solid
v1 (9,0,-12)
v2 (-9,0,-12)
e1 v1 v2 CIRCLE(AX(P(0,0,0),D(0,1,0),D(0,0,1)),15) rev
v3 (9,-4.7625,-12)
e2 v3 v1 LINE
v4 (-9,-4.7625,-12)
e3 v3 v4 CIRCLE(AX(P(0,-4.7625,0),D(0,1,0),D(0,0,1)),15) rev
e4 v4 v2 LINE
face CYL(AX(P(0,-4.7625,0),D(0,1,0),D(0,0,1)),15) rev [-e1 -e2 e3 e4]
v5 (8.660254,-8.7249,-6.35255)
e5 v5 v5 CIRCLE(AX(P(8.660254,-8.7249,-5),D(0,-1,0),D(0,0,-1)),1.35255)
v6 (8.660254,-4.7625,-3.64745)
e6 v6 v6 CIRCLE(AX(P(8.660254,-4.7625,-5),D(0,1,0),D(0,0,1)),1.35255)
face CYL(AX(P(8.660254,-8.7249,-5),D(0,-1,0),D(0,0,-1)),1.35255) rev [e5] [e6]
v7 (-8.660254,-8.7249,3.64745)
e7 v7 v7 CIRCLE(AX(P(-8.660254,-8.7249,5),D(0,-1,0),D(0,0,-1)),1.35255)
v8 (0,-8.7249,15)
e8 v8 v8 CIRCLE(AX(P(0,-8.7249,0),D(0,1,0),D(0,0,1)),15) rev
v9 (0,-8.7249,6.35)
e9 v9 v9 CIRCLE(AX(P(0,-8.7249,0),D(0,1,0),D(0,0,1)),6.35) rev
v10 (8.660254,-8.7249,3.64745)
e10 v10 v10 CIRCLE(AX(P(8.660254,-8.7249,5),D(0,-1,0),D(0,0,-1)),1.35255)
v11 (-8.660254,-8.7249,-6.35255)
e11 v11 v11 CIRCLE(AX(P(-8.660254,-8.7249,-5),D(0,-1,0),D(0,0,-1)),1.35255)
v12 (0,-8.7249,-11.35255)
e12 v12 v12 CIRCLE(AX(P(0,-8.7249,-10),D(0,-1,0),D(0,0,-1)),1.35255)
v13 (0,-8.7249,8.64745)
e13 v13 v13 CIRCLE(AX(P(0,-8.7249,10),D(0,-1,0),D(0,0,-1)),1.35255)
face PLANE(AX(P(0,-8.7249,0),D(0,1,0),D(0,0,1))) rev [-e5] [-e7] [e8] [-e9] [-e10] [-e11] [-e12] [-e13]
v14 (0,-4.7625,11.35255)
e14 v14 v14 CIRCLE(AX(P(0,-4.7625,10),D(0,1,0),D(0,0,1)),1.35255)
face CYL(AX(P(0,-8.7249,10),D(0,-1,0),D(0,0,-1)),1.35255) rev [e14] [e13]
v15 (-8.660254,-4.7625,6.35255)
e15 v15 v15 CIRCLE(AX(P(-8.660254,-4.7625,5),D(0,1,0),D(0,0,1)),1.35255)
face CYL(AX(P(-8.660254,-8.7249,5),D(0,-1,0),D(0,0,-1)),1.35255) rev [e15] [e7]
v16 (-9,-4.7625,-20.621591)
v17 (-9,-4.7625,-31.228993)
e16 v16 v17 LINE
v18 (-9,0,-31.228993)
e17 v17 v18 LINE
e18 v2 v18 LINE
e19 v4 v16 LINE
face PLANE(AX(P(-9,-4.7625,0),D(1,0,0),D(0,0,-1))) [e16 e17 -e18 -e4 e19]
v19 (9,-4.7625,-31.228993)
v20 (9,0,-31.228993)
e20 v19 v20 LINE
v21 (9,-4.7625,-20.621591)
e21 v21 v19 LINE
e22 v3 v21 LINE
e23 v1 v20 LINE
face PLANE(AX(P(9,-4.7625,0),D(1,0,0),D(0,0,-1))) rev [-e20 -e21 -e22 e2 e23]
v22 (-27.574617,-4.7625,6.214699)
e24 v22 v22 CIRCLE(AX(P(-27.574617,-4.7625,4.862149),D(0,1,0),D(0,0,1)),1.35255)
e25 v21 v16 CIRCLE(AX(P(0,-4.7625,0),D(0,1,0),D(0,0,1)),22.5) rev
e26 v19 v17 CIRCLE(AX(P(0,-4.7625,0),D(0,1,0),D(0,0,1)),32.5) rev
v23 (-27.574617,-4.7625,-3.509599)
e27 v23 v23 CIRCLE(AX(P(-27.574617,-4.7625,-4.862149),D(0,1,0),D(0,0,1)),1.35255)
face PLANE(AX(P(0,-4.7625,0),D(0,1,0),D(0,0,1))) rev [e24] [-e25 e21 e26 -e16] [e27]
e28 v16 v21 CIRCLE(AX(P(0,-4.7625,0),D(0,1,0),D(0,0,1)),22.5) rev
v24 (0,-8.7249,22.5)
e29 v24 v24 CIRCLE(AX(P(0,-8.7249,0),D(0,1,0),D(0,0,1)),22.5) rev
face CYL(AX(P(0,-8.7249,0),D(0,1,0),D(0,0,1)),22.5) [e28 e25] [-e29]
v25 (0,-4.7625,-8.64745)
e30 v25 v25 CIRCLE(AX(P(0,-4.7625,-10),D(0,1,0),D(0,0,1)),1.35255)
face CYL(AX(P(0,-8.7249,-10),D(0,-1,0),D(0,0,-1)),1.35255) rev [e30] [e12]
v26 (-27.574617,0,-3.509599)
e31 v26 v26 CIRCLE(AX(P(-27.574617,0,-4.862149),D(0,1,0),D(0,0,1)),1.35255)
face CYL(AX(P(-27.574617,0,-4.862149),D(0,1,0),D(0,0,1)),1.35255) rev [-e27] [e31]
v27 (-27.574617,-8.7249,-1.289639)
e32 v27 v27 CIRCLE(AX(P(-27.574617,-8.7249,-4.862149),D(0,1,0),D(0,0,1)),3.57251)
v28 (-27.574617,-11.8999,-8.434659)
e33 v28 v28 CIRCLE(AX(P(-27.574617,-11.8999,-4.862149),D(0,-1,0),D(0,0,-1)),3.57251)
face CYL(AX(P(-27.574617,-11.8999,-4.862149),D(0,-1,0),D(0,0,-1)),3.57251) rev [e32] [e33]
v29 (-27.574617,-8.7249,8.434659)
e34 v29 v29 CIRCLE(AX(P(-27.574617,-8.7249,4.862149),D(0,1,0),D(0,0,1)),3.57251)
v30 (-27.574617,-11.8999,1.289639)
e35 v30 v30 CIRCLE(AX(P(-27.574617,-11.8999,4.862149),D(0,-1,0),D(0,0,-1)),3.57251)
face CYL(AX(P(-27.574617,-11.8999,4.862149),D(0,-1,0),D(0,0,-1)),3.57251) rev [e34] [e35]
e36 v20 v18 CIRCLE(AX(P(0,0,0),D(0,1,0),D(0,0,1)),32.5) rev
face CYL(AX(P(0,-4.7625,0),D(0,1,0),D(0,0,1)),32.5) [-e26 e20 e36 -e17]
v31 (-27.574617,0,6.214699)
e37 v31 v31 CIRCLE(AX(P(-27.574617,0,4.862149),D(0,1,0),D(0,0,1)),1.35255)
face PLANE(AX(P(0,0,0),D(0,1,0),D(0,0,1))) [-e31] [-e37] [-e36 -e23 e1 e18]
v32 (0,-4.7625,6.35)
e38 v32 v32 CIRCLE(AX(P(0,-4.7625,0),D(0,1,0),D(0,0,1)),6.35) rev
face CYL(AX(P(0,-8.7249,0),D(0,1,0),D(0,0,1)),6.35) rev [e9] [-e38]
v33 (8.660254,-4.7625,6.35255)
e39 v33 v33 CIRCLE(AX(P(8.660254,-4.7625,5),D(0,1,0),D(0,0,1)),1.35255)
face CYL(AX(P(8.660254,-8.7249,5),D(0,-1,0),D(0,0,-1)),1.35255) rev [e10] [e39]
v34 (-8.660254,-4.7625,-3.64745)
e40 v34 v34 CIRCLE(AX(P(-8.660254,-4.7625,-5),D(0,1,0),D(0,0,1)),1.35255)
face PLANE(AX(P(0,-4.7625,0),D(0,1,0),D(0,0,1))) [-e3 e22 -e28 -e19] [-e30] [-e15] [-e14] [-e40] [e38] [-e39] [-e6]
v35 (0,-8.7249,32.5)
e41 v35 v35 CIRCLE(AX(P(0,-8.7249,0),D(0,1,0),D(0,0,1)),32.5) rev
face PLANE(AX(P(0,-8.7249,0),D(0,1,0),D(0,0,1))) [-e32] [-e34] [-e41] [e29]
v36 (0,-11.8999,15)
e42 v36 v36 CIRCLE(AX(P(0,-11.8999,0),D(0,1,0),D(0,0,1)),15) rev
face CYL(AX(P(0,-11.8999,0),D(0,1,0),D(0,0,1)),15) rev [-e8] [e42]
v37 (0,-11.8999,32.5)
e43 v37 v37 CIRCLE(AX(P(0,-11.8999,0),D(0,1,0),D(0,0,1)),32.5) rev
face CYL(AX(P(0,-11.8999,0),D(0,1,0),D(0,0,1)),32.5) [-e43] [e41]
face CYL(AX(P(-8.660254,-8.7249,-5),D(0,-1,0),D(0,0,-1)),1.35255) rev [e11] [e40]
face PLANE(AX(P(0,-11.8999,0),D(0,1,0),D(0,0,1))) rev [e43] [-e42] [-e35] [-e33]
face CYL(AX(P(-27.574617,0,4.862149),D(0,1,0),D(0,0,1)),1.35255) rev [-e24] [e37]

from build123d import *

# Parameters (mm, degrees)
SPINDLE_START                             = 4.7625
SKETCH6_R                                 = 22.5
SKETCH6_R_2                               = 6.35
SPINDLE_CENTER_DEPTH                      = 3.9624
LOWER_START                               = 8.7249
LOWER_FLANGE_DEPTH                        = 3.175
UPPER_FLANGE_DEPTH                        = 4.7625
F_6_32_TAPPED_HOLE1_D                     = 2.7051
CBORE_START                               = -11.8999
CBORE_FOR_6_SOCKET_HEAD_CAP_SCREW1_OUTL_R = 3.57251
CBORE_FOR_6_SOCKET_HEAD_CAP_SCREW1_DEPTH  = 3.175
F_6_32_TAPPED_HOLE3_D                     = 2.7051
F_6_32_TAPPED_HOLE3_DEPTH                 = 9.49
F_6_32_TAPPED_HOLE3_TIP                   = 0.81269403


# Read off the part's stored shape, not the designer's step: CBORE for #6 Socket Head Cap Screw1
with BuildPart() as part:
    # Sketch6 → Spindle Center (new body)
    with BuildSketch(Plane.XZ.offset(SPINDLE_START)):
        with Locations(Location((0, 0, 0), (0, 0, 90))):
            Circle(SKETCH6_R)
        with Locations(Location((0, 0, 0), (0, 0, 90))):
            Circle(SKETCH6_R_2, mode=Mode.SUBTRACT)
    extrude(amount=SPINDLE_CENTER_DEPTH)

    # Sketch6<3> → Lower Flange (add)
    with BuildSketch(Plane.XZ.offset(LOWER_START)):
        with BuildLine():
            Line((0, -32.5), (0, -22.5))
            ThreePointArc((0, -22.5), (-4.596966983, -22.025392041), (-9, -20.621590627))
            Line((-9, -20.621590627), (-9, -31.228992939))
            ThreePointArc((-9, -31.228992939), (-4.544652323, -32.180679534), (0, -32.5))
        make_face()
        with BuildLine():
            Line((-9, -31.228992939), (-9, -20.621590627))
            ThreePointArc((-9, -20.621590627), (-22.025392041, 4.596966983), (0, 22.5))
            Line((0, 22.5), (0, 32.5))
            ThreePointArc((0, 32.5), (-32.180679534, 4.544652323), (-9, -31.228992939))
        make_face()
        with BuildLine():
            ThreePointArc((22.5, 0), (18.824850597, -12.323757544), (9, -20.621590627))
            Line((9, -20.621590627), (9, -31.228992939))
            ThreePointArc((9, -31.228992939), (25.968731197, -19.541622246), (32.5, 0))
            ThreePointArc((32.5, 0), (22.980970389, 22.980970389), (0, 32.5))
            Line((0, 32.5), (0, 22.5))
            ThreePointArc((0, 22.5), (15.909902577, 15.909902577), (22.5, 0))
        make_face()
        with BuildLine():
            Line((9, -31.228992939), (9, -20.621590627))
            ThreePointArc((9, -20.621590627), (4.596966983, -22.025392041), (0, -22.5))
            Line((0, -22.5), (0, -32.5))
            ThreePointArc((0, -32.5), (4.544652323, -32.180679534), (9, -31.228992939))
        make_face()
        with BuildLine():
            ThreePointArc((15, 0), (13.416407865, -6.708203932), (9, -12))
            Line((9, -12), (9, -20.621590627))
            ThreePointArc((9, -20.621590627), (18.824850597, -12.323757544), (22.5, 0))
            ThreePointArc((22.5, 0), (15.909902577, 15.909902577), (0, 22.5))
            Line((0, 22.5), (0, 15))
            ThreePointArc((0, 15), (10.606601718, 10.606601718), (15, 0))
        make_face()
        with BuildLine():
            Line((9, -20.621590627), (9, -12))
            ThreePointArc((9, -12), (4.74341649, -14.230249471), (0, -15))
            Line((0, -15), (0, -22.5))
            ThreePointArc((0, -22.5), (4.596966983, -22.025392041), (9, -20.621590627))
        make_face()
        with BuildLine():
            Line((0, -22.5), (0, -15))
            ThreePointArc((0, -15), (-4.74341649, -14.230249471), (-9, -12))
            Line((-9, -12), (-9, -20.621590627))
            ThreePointArc((-9, -20.621590627), (-4.596966983, -22.025392041), (0, -22.5))
        make_face()
        with BuildLine():
            Line((-9, -20.621590627), (-9, -12))
            ThreePointArc((-9, -12), (-14.230249471, 4.74341649), (0, 15))
            Line((0, 15), (0, 22.5))
            ThreePointArc((0, 22.5), (-22.025392041, 4.596966983), (-9, -20.621590627))
        make_face()
    extrude(amount=LOWER_FLANGE_DEPTH)

    # Sketch6<4> → Upper Flange (add)
    with BuildSketch(Plane.XZ):
        with BuildLine():
            Line((9, -12), (9, -31.228992939))
            ThreePointArc((9, -31.228992939), (0, 32.5), (-9, -31.228992939))
            Line((-9, -31.228992939), (-9, -12))
            ThreePointArc((-9, -12), (0, 15), (9, -12))
        make_face()
    extrude(amount=UPPER_FLANGE_DEPTH)

    # #6-32 Tapped Hole1 (through all)
    with Locations(Plane(origin=(0, -8.7249, 10), x_dir=(0, 0, -1), z_dir=(0, -1, 0))):
        with Locations((0, 0), (15, -8.660254038), (15, 8.660254038), (5, -8.660254038), (20, 0), (5, 8.660254038)):
            Hole(F_6_32_TAPPED_HOLE1_D / 2)

    # CBORE for #6 Socket Head Cap Screw1 outl → CBORE for #6 Socket Head Cap Screw1 (cut)
    with BuildSketch(Plane(origin=(0, 0, 0), x_dir=(1, 0, 0), z_dir=(0, 1, 0)).offset(CBORE_START)):
        with Locations((-27.574617084, -4.862148975)):
            Circle(CBORE_FOR_6_SOCKET_HEAD_CAP_SCREW1_OUTL_R)
        with Locations((-27.574617084, 4.862148975)):
            Circle(CBORE_FOR_6_SOCKET_HEAD_CAP_SCREW1_OUTL_R)
    extrude(amount=CBORE_FOR_6_SOCKET_HEAD_CAP_SCREW1_DEPTH, mode=Mode.SUBTRACT)

    # #6-32 Tapped Hole3
    with Locations(Plane(origin=(-27.574617084, 0, 4.862148975), x_dir=(0, 0, 1), z_dir=(0, 1, 0))):
        with Locations((0, 0), (-9.72429795, 0)):
            Hole(F_6_32_TAPPED_HOLE3_D / 2, depth=F_6_32_TAPPED_HOLE3_DEPTH)
            with Locations((0, 0, -(F_6_32_TAPPED_HOLE3_DEPTH + F_6_32_TAPPED_HOLE3_TIP / 2))):  # 118° drill point
                Cone(0, F_6_32_TAPPED_HOLE3_D / 2, F_6_32_TAPPED_HOLE3_TIP, mode=Mode.SUBTRACT)


solid = part.part
